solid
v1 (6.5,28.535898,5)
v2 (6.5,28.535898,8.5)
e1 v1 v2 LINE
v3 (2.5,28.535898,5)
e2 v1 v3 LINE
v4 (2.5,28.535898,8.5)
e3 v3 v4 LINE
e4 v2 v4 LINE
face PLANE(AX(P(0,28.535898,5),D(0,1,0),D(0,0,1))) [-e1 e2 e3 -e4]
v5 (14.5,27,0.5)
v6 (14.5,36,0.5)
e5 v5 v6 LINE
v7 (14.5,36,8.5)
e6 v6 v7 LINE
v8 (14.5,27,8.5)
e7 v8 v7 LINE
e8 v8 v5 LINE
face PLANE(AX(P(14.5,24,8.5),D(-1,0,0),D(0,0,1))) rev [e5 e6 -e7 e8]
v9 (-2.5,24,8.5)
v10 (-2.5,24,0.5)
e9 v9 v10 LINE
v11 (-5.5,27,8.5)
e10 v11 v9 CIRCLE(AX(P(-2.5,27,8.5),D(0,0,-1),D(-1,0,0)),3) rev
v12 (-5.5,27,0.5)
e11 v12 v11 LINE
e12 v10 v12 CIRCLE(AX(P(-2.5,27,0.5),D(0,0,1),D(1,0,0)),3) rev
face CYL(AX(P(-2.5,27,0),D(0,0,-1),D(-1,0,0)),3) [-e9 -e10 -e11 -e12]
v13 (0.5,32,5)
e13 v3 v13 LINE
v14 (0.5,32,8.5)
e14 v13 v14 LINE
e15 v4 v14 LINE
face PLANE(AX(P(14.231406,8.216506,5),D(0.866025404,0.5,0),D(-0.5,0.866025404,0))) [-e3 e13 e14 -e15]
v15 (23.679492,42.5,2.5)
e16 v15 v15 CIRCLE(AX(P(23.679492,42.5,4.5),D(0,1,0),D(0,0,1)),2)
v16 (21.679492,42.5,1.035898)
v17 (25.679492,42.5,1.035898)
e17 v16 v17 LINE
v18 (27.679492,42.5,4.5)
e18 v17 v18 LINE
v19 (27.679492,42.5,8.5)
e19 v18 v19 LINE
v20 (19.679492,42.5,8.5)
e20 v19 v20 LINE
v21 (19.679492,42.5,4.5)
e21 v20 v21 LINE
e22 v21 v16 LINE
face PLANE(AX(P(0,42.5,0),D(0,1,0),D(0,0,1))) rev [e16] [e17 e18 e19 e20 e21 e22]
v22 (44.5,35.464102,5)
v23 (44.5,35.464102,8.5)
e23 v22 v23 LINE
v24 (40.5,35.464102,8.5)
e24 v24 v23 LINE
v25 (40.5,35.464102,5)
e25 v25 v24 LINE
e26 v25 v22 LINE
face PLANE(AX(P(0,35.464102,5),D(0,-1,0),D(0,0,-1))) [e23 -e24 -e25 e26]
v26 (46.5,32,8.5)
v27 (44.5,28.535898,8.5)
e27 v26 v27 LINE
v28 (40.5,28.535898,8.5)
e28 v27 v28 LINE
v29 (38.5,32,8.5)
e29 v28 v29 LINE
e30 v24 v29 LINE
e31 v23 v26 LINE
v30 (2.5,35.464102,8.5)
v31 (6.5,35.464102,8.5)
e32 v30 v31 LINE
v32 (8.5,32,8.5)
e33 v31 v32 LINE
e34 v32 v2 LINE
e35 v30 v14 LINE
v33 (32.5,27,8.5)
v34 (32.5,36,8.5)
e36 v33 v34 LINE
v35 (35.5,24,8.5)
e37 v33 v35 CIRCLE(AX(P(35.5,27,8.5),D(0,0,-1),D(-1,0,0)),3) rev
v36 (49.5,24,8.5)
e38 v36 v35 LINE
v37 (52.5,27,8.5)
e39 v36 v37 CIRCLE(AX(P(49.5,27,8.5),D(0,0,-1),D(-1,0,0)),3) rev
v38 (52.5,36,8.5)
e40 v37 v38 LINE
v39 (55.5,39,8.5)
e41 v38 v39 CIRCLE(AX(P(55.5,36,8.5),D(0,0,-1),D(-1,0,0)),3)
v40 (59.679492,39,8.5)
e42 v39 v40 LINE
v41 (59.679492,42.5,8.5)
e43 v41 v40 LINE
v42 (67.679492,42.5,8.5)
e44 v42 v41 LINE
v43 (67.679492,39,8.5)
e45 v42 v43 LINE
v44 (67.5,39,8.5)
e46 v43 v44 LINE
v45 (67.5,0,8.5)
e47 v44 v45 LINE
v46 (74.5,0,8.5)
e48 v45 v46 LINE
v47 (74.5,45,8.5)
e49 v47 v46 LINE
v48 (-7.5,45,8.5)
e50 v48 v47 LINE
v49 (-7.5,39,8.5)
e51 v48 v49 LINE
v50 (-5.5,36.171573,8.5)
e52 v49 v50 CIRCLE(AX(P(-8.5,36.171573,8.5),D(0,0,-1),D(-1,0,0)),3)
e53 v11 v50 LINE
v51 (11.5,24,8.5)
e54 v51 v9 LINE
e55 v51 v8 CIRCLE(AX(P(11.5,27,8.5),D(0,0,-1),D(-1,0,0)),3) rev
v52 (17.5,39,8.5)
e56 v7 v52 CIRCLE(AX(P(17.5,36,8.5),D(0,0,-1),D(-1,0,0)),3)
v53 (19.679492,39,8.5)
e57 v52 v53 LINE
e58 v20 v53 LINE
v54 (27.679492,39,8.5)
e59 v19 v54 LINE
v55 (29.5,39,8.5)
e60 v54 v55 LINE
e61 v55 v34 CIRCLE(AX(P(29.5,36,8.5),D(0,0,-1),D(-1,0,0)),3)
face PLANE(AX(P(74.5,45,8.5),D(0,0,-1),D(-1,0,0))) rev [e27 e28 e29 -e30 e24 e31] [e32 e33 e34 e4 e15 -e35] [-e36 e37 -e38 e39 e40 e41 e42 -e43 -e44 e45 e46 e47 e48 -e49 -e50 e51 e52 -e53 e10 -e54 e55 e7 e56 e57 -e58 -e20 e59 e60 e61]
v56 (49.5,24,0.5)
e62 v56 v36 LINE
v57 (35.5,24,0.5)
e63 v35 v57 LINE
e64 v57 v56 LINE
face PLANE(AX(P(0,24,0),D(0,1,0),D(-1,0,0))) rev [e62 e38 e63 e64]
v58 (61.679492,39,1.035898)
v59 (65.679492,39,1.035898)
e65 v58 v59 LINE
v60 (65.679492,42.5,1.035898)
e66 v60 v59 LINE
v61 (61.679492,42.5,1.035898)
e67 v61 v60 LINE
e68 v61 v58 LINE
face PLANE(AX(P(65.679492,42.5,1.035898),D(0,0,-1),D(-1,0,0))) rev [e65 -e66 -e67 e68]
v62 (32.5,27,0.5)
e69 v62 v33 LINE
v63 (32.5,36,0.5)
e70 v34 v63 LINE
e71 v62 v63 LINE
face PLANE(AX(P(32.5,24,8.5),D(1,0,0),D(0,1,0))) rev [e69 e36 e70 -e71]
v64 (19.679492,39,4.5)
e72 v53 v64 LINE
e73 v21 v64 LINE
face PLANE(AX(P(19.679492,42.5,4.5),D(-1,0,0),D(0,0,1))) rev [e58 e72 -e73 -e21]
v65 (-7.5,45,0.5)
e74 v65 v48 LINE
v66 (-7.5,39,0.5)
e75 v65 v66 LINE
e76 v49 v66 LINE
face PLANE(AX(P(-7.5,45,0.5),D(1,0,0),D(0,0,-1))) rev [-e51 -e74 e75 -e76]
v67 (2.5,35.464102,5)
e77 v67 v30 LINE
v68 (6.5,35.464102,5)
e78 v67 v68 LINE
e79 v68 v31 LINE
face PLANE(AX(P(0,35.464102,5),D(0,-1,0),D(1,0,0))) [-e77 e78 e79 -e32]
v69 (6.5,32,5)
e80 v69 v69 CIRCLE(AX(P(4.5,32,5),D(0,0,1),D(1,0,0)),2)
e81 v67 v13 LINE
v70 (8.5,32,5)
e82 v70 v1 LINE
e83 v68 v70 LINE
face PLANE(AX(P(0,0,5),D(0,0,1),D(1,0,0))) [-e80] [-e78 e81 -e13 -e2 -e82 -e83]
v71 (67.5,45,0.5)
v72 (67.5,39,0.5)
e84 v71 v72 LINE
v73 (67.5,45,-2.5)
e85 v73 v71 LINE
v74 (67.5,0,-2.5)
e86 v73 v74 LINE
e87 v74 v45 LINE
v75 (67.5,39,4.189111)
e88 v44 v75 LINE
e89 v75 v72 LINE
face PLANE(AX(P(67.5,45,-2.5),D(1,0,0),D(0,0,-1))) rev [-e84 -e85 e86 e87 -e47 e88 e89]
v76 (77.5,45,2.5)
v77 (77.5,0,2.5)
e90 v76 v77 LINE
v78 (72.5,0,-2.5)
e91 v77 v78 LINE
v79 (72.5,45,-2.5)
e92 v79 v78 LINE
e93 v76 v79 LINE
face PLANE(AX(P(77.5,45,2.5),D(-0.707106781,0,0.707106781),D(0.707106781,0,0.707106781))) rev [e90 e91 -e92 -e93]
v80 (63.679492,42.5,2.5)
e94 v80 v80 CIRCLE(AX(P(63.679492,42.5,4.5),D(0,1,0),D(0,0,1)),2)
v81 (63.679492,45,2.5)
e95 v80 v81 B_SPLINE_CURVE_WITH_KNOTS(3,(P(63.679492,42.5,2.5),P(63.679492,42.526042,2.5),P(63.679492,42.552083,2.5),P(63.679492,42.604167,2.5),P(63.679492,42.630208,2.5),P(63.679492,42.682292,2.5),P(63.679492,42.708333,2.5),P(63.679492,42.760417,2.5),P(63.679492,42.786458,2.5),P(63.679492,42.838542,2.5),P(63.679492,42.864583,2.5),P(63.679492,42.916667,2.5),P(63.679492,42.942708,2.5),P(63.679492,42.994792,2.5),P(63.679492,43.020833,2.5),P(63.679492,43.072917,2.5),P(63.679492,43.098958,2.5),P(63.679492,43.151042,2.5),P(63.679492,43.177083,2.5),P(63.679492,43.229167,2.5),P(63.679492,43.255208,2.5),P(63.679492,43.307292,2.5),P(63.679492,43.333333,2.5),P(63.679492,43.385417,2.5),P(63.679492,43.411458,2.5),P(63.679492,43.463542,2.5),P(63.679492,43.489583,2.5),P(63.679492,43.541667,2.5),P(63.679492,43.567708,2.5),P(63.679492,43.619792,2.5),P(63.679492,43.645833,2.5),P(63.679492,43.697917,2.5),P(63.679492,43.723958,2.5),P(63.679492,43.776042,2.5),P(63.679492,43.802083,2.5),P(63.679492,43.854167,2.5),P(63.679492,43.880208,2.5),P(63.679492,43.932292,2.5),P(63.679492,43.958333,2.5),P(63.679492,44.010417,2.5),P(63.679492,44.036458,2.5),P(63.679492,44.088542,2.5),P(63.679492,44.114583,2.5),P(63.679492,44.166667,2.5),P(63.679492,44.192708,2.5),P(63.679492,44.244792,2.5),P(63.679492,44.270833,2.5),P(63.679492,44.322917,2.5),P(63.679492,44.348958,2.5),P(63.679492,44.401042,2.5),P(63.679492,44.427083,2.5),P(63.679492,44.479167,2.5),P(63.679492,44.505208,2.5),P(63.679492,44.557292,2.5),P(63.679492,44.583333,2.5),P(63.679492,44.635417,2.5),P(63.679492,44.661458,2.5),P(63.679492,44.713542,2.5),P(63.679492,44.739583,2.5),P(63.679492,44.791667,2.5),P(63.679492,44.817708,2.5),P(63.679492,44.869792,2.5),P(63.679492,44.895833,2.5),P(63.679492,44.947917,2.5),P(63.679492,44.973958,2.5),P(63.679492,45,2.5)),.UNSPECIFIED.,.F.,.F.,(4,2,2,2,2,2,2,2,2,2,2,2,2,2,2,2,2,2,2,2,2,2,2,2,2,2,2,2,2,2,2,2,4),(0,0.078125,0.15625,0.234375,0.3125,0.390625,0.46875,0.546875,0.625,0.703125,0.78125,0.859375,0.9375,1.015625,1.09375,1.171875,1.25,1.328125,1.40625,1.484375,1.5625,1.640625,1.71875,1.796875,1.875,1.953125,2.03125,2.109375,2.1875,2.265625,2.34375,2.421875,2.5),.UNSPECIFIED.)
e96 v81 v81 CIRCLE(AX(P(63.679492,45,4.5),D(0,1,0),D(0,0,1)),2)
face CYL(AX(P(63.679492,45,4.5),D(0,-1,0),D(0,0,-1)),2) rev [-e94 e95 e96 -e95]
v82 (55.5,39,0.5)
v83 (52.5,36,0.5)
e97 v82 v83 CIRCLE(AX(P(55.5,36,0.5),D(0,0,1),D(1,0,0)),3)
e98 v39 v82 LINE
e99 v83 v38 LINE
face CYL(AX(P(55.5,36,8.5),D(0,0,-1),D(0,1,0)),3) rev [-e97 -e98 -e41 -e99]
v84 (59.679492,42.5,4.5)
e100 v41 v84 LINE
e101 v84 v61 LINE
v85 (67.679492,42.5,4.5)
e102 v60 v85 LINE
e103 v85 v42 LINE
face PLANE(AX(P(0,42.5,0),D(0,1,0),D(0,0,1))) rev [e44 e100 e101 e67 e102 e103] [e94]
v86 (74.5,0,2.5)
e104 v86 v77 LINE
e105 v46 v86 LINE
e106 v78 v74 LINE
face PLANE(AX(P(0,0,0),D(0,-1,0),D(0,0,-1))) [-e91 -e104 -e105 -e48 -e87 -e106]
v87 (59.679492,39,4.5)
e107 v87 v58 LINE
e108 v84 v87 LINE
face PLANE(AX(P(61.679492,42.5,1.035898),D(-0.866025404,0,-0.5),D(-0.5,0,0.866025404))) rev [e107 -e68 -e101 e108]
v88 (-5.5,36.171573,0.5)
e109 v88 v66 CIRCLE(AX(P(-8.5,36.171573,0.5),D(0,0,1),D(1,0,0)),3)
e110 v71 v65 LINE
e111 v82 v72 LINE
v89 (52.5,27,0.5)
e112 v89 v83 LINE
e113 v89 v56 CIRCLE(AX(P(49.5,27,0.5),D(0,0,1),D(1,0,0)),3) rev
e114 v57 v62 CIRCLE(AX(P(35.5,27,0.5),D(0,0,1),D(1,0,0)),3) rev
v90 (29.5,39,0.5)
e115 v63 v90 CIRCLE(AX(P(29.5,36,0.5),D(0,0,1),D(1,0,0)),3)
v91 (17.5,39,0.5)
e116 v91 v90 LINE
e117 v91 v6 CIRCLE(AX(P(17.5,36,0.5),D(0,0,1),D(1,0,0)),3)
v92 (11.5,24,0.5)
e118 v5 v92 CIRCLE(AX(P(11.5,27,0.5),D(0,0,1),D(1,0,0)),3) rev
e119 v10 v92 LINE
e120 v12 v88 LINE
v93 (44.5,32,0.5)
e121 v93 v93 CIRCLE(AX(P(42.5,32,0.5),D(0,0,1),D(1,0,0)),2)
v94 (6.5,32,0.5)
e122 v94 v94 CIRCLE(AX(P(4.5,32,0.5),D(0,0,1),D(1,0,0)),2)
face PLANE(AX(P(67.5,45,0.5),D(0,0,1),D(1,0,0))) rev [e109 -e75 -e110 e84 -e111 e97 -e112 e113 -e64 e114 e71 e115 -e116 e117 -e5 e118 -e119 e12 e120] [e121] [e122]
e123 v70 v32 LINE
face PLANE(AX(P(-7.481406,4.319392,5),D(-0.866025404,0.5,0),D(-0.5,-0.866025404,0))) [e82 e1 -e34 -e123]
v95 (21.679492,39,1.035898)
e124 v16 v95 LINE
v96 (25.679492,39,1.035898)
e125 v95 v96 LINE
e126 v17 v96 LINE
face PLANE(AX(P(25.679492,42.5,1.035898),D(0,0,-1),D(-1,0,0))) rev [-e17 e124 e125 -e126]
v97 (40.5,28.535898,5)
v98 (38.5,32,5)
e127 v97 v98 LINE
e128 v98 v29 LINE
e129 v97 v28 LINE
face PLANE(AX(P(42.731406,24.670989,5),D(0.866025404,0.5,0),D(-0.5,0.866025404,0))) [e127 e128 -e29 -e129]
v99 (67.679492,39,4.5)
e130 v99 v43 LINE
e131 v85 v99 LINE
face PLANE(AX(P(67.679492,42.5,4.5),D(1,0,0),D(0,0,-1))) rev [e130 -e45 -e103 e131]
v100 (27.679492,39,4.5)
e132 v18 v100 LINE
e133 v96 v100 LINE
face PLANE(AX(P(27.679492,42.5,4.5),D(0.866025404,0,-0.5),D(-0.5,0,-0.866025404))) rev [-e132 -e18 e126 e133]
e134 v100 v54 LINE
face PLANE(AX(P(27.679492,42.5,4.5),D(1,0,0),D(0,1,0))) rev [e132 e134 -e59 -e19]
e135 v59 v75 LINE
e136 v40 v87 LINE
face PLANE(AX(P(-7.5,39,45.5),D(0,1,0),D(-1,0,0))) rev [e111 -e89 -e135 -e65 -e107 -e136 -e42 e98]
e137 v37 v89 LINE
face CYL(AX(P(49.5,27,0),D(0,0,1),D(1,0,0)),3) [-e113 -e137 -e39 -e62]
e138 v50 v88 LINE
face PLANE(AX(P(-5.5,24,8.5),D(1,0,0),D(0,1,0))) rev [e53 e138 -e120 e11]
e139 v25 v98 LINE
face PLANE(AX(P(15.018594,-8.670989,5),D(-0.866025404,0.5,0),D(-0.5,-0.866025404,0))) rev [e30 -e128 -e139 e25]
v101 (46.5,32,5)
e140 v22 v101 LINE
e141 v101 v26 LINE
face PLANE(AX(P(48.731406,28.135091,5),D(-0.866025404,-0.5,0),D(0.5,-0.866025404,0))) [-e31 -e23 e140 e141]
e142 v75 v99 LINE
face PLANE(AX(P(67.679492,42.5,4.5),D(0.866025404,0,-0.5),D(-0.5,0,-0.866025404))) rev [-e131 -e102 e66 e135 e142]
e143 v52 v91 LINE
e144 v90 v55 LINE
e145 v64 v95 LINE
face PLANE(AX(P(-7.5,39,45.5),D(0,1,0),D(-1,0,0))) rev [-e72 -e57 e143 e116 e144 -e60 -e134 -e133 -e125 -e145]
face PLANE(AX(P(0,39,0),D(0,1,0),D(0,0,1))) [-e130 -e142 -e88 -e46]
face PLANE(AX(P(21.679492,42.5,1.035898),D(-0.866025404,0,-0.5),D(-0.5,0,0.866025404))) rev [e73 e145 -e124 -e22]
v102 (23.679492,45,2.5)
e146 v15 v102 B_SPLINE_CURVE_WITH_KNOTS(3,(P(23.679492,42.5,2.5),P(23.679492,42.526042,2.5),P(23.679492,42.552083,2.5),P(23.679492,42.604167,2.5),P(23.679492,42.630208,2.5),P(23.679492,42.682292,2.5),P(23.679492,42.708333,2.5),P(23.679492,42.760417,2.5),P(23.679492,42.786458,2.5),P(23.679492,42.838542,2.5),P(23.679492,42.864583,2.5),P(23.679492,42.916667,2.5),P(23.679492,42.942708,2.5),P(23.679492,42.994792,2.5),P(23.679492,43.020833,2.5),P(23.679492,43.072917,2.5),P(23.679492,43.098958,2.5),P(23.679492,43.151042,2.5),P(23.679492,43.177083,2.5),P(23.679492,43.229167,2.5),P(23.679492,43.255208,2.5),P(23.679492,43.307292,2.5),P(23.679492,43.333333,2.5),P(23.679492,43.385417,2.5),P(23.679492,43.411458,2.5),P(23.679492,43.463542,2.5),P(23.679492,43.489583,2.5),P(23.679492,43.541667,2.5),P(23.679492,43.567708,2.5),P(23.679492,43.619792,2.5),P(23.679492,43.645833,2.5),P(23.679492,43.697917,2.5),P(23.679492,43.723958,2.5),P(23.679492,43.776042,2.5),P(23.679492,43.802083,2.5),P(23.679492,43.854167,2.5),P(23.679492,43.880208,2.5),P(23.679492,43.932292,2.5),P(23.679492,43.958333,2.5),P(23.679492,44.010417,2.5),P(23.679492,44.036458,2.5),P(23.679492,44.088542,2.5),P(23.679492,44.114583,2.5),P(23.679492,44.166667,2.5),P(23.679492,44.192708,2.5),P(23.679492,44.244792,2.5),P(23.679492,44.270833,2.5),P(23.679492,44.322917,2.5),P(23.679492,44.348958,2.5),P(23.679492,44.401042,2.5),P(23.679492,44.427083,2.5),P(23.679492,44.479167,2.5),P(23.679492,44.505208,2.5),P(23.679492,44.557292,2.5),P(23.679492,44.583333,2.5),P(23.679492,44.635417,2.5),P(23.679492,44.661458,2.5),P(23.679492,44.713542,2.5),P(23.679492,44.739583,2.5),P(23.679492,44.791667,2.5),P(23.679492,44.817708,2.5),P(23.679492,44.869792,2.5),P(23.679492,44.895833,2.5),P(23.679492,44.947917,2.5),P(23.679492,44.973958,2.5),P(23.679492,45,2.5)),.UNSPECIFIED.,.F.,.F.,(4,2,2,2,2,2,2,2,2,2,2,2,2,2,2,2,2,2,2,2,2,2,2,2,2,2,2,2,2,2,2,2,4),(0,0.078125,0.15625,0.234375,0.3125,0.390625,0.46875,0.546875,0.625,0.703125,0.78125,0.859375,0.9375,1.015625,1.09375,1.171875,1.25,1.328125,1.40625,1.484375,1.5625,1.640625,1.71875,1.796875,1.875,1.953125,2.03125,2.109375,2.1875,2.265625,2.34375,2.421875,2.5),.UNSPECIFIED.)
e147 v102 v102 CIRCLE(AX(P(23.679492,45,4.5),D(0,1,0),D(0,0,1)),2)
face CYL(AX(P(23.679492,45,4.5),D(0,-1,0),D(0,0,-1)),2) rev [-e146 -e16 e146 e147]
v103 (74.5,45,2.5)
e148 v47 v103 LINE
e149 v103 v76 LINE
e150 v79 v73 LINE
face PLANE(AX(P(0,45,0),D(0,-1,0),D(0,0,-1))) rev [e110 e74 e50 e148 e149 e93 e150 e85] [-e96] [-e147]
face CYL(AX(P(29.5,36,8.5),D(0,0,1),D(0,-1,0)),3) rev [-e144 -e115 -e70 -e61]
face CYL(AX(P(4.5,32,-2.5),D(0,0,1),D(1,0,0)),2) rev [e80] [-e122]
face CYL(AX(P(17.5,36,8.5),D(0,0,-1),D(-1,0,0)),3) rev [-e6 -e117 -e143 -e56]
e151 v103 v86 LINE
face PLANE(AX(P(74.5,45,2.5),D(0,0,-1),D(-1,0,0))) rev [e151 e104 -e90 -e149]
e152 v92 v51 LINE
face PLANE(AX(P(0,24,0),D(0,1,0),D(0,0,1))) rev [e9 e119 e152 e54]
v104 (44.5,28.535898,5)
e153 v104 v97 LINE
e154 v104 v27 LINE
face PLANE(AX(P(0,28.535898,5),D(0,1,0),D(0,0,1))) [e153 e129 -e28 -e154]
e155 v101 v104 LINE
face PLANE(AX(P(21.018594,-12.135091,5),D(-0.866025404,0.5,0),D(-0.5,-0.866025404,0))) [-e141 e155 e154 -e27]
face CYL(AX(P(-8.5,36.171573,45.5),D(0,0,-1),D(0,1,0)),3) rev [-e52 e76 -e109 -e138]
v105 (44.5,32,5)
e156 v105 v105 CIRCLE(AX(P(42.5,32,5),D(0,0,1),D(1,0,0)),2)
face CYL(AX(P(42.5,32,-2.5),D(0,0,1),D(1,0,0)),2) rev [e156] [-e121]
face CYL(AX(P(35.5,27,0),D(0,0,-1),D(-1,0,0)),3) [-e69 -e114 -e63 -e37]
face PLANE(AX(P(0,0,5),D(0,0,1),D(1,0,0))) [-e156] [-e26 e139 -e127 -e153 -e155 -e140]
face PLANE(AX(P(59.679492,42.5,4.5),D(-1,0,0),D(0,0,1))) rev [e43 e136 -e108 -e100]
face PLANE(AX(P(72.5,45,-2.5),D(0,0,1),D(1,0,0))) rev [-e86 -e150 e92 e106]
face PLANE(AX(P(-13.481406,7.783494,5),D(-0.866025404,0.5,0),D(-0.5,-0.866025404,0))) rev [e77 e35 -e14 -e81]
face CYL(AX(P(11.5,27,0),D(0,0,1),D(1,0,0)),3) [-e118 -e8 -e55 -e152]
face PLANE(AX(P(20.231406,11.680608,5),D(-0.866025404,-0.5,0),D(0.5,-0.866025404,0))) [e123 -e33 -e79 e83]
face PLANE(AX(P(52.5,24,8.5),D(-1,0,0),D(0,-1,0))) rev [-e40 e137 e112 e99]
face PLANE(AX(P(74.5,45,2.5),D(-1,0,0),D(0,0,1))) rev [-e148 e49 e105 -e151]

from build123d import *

# Parameters (mm, degrees)
ESQUISSE1_R                  = 2
BOSS_EXTRU_1_DEPTH           = 45
ESQUISSE2_W                  = 75
ESQUISSE2_H                  = 39
ENL_V_MAT_EXTRU_1_DEPTH      = 45
ENL_V_MAT_EXTRU_2_DEPTH      = 3.5
ESQUISSE4_W                  = 20
ESQUISSE4_H                  = 8
BOSS_EXTRU_2_DEPTH           = 15
CONG_1_R                     = 3
ENL_V_MAT_EXTRU_3_DEPTH      = 3.5
ENL_V_MAT_EXTRU_4_DEPTH      = 90.930528743
ENL_V_MAT_EXTRU_4_DEPTH_BACK = 90.930528743
ESQUISSE7_R                  = 2


with BuildPart() as part:
    # Esquisse1 → Boss.-Extru.1 (new body)
    with BuildSketch(Plane(origin=(0, 0, 0), x_dir=(1, 0, 0), z_dir=(0, 1, 0))):
        Polygon((77.5, -2.5), (72.5, 2.5), (67.5, 2.5), (67.5, -0.5), (-7.5, -0.5), (-7.5, -8.5), (74.5, -8.5), (74.5, -2.5), align=None)
        with Locations(Location((63.679491924, -4.5, 0), (0, 0, 90))):
            Circle(ESQUISSE1_R, mode=Mode.SUBTRACT)
        with Locations(Location((23.679491924, -4.5, 0), (0, 0, 90))):
            Circle(ESQUISSE1_R, mode=Mode.SUBTRACT)
    extrude(amount=BOSS_EXTRU_1_DEPTH)

    # Esquisse2 → Enlèv. mat.-Extru.1 (cut)
    with BuildSketch(Plane(origin=(0, 0, 0.5), x_dir=(-1, 0, 0), z_dir=(0, 0, -1))):
        with Locations((-30, 19.5)):
            Rectangle(ESQUISSE2_W, ESQUISSE2_H)
    extrude(amount=-ENL_V_MAT_EXTRU_1_DEPTH, mode=Mode.SUBTRACT)

    # Esquisse3 → Enlèv. mat.-Extru.2 (cut)
    with BuildSketch(Plane.XZ.offset(-39)):
        Polygon((65.679491924, 1.035898385), (61.679491924, 1.035898385), (59.679491924, 4.5), (59.679491924, 8.5), (67.679491924, 8.5), (67.679491924, 4.5), align=None)
        Polygon((25.679491924, 1.035898385), (21.679491924, 1.035898385), (19.679491924, 4.5), (19.679491924, 8.5), (27.679491924, 8.5), (27.679491924, 4.5), align=None)
    extrude(amount=-ENL_V_MAT_EXTRU_2_DEPTH, mode=Mode.SUBTRACT)

    # Esquisse4 → Boss.-Extru.2 (add)
    with BuildSketch(Plane.XZ.offset(-39)):
        with Locations((42.5, 4.5)):
            Rectangle(ESQUISSE4_W, ESQUISSE4_H)
        with Locations((4.5, 4.5)):
            Rectangle(ESQUISSE4_W, ESQUISSE4_H)
    extrude(amount=BOSS_EXTRU_2_DEPTH)

    # Congé1
    # the kernel refuses this fillet: 3 mm, written as the material it adds along each edge
    with BuildSketch(Plane(origin=(52.5, 39, 0.5), x_dir=(1, 0, 0), z_dir=(0, 0, 1)), Plane(origin=(32.5, 39, 8.5), x_dir=(-1, 0, 0), z_dir=(0, 0, -1)), Plane(origin=(14.5, 39, 0.5), x_dir=(1, 0, 0), z_dir=(0, 0, 1))) as cong_1_piece_1:
        with BuildLine():
            CenterArc((CONG_1_R, -CONG_1_R), CONG_1_R, 90, 90)
            Line((0, -CONG_1_R), (0, 0))
            Line((0, 0), (CONG_1_R, 0))
        make_face()
    extrude(amount=8)
    with BuildSketch(Plane(origin=(-5.5, 39, 8.5), x_dir=(-1, 0, 0), z_dir=(0, 0, -1))) as cong_1_piece_2:
        with BuildLine():
            CenterArc((3, -2.828427125), CONG_1_R, 109.471220634, 70.528779366)
            Line((0, -2.828427125), (0, 0))
            Line((0, 0), (2, 0))
        make_face()
    extrude(amount=8)
    # the kernel refuses this fillet: 3 mm, written as the material it takes off along each edge
    with BuildSketch(Plane(origin=(52.5, 24, -7), x_dir=(0, 1, 0), z_dir=(0, 0, 1)), Plane(origin=(14.5, 24, -7), x_dir=(0, 1, 0), z_dir=(0, 0, 1))) as cong_1_2_piece_1:
        with BuildLine():
            CenterArc((CONG_1_R, CONG_1_R), CONG_1_R, 180, 90)
            Line((0, CONG_1_R), (0, 0))
            Line((0, 0), (CONG_1_R, 0))
        make_face()
    extrude(amount=23, mode=Mode.SUBTRACT)
    with BuildSketch(Plane(origin=(32.5, 24, 16), x_dir=(1, 0, 0), z_dir=(0, 0, -1)), Plane(origin=(-5.5, 24, 16), x_dir=(1, 0, 0), z_dir=(0, 0, -1))) as cong_1_2_piece_2:
        with BuildLine():
            CenterArc((CONG_1_R, -CONG_1_R), CONG_1_R, 90, 90)
            Line((0, -CONG_1_R), (0, 0))
            Line((0, 0), (CONG_1_R, 0))
        make_face()
    extrude(amount=23, mode=Mode.SUBTRACT)

    # Esquisse5 → Enlèv. mat.-Extru.3 (cut)
    with BuildSketch(Plane.XY.offset(8.5)):
        Polygon((8.5, 32), (6.5, 28.535898385), (2.5, 28.535898385), (0.5, 32), (2.5, 35.464101615), (6.5, 35.464101615), align=None)
        Polygon((46.5, 32), (44.5, 28.535898385), (40.5, 28.535898385), (38.5, 32), (40.5, 35.464101615), (44.5, 35.464101615), align=None)
    extrude(amount=-ENL_V_MAT_EXTRU_3_DEPTH, mode=Mode.SUBTRACT)

    # Esquisse7 → Enlèv. mat.-Extru.4 (cut, two sides: drawn at the far end of the back side and taken through both)
    with BuildSketch(Plane.XY.offset(5).offset(-ENL_V_MAT_EXTRU_4_DEPTH_BACK)):
        with Locations((4.5, 32)):
            Circle(ESQUISSE7_R)
        with Locations((42.5, 32)):
            Circle(ESQUISSE7_R)
    extrude(amount=ENL_V_MAT_EXTRU_4_DEPTH + ENL_V_MAT_EXTRU_4_DEPTH_BACK, mode=Mode.SUBTRACT)


solid = part.part
